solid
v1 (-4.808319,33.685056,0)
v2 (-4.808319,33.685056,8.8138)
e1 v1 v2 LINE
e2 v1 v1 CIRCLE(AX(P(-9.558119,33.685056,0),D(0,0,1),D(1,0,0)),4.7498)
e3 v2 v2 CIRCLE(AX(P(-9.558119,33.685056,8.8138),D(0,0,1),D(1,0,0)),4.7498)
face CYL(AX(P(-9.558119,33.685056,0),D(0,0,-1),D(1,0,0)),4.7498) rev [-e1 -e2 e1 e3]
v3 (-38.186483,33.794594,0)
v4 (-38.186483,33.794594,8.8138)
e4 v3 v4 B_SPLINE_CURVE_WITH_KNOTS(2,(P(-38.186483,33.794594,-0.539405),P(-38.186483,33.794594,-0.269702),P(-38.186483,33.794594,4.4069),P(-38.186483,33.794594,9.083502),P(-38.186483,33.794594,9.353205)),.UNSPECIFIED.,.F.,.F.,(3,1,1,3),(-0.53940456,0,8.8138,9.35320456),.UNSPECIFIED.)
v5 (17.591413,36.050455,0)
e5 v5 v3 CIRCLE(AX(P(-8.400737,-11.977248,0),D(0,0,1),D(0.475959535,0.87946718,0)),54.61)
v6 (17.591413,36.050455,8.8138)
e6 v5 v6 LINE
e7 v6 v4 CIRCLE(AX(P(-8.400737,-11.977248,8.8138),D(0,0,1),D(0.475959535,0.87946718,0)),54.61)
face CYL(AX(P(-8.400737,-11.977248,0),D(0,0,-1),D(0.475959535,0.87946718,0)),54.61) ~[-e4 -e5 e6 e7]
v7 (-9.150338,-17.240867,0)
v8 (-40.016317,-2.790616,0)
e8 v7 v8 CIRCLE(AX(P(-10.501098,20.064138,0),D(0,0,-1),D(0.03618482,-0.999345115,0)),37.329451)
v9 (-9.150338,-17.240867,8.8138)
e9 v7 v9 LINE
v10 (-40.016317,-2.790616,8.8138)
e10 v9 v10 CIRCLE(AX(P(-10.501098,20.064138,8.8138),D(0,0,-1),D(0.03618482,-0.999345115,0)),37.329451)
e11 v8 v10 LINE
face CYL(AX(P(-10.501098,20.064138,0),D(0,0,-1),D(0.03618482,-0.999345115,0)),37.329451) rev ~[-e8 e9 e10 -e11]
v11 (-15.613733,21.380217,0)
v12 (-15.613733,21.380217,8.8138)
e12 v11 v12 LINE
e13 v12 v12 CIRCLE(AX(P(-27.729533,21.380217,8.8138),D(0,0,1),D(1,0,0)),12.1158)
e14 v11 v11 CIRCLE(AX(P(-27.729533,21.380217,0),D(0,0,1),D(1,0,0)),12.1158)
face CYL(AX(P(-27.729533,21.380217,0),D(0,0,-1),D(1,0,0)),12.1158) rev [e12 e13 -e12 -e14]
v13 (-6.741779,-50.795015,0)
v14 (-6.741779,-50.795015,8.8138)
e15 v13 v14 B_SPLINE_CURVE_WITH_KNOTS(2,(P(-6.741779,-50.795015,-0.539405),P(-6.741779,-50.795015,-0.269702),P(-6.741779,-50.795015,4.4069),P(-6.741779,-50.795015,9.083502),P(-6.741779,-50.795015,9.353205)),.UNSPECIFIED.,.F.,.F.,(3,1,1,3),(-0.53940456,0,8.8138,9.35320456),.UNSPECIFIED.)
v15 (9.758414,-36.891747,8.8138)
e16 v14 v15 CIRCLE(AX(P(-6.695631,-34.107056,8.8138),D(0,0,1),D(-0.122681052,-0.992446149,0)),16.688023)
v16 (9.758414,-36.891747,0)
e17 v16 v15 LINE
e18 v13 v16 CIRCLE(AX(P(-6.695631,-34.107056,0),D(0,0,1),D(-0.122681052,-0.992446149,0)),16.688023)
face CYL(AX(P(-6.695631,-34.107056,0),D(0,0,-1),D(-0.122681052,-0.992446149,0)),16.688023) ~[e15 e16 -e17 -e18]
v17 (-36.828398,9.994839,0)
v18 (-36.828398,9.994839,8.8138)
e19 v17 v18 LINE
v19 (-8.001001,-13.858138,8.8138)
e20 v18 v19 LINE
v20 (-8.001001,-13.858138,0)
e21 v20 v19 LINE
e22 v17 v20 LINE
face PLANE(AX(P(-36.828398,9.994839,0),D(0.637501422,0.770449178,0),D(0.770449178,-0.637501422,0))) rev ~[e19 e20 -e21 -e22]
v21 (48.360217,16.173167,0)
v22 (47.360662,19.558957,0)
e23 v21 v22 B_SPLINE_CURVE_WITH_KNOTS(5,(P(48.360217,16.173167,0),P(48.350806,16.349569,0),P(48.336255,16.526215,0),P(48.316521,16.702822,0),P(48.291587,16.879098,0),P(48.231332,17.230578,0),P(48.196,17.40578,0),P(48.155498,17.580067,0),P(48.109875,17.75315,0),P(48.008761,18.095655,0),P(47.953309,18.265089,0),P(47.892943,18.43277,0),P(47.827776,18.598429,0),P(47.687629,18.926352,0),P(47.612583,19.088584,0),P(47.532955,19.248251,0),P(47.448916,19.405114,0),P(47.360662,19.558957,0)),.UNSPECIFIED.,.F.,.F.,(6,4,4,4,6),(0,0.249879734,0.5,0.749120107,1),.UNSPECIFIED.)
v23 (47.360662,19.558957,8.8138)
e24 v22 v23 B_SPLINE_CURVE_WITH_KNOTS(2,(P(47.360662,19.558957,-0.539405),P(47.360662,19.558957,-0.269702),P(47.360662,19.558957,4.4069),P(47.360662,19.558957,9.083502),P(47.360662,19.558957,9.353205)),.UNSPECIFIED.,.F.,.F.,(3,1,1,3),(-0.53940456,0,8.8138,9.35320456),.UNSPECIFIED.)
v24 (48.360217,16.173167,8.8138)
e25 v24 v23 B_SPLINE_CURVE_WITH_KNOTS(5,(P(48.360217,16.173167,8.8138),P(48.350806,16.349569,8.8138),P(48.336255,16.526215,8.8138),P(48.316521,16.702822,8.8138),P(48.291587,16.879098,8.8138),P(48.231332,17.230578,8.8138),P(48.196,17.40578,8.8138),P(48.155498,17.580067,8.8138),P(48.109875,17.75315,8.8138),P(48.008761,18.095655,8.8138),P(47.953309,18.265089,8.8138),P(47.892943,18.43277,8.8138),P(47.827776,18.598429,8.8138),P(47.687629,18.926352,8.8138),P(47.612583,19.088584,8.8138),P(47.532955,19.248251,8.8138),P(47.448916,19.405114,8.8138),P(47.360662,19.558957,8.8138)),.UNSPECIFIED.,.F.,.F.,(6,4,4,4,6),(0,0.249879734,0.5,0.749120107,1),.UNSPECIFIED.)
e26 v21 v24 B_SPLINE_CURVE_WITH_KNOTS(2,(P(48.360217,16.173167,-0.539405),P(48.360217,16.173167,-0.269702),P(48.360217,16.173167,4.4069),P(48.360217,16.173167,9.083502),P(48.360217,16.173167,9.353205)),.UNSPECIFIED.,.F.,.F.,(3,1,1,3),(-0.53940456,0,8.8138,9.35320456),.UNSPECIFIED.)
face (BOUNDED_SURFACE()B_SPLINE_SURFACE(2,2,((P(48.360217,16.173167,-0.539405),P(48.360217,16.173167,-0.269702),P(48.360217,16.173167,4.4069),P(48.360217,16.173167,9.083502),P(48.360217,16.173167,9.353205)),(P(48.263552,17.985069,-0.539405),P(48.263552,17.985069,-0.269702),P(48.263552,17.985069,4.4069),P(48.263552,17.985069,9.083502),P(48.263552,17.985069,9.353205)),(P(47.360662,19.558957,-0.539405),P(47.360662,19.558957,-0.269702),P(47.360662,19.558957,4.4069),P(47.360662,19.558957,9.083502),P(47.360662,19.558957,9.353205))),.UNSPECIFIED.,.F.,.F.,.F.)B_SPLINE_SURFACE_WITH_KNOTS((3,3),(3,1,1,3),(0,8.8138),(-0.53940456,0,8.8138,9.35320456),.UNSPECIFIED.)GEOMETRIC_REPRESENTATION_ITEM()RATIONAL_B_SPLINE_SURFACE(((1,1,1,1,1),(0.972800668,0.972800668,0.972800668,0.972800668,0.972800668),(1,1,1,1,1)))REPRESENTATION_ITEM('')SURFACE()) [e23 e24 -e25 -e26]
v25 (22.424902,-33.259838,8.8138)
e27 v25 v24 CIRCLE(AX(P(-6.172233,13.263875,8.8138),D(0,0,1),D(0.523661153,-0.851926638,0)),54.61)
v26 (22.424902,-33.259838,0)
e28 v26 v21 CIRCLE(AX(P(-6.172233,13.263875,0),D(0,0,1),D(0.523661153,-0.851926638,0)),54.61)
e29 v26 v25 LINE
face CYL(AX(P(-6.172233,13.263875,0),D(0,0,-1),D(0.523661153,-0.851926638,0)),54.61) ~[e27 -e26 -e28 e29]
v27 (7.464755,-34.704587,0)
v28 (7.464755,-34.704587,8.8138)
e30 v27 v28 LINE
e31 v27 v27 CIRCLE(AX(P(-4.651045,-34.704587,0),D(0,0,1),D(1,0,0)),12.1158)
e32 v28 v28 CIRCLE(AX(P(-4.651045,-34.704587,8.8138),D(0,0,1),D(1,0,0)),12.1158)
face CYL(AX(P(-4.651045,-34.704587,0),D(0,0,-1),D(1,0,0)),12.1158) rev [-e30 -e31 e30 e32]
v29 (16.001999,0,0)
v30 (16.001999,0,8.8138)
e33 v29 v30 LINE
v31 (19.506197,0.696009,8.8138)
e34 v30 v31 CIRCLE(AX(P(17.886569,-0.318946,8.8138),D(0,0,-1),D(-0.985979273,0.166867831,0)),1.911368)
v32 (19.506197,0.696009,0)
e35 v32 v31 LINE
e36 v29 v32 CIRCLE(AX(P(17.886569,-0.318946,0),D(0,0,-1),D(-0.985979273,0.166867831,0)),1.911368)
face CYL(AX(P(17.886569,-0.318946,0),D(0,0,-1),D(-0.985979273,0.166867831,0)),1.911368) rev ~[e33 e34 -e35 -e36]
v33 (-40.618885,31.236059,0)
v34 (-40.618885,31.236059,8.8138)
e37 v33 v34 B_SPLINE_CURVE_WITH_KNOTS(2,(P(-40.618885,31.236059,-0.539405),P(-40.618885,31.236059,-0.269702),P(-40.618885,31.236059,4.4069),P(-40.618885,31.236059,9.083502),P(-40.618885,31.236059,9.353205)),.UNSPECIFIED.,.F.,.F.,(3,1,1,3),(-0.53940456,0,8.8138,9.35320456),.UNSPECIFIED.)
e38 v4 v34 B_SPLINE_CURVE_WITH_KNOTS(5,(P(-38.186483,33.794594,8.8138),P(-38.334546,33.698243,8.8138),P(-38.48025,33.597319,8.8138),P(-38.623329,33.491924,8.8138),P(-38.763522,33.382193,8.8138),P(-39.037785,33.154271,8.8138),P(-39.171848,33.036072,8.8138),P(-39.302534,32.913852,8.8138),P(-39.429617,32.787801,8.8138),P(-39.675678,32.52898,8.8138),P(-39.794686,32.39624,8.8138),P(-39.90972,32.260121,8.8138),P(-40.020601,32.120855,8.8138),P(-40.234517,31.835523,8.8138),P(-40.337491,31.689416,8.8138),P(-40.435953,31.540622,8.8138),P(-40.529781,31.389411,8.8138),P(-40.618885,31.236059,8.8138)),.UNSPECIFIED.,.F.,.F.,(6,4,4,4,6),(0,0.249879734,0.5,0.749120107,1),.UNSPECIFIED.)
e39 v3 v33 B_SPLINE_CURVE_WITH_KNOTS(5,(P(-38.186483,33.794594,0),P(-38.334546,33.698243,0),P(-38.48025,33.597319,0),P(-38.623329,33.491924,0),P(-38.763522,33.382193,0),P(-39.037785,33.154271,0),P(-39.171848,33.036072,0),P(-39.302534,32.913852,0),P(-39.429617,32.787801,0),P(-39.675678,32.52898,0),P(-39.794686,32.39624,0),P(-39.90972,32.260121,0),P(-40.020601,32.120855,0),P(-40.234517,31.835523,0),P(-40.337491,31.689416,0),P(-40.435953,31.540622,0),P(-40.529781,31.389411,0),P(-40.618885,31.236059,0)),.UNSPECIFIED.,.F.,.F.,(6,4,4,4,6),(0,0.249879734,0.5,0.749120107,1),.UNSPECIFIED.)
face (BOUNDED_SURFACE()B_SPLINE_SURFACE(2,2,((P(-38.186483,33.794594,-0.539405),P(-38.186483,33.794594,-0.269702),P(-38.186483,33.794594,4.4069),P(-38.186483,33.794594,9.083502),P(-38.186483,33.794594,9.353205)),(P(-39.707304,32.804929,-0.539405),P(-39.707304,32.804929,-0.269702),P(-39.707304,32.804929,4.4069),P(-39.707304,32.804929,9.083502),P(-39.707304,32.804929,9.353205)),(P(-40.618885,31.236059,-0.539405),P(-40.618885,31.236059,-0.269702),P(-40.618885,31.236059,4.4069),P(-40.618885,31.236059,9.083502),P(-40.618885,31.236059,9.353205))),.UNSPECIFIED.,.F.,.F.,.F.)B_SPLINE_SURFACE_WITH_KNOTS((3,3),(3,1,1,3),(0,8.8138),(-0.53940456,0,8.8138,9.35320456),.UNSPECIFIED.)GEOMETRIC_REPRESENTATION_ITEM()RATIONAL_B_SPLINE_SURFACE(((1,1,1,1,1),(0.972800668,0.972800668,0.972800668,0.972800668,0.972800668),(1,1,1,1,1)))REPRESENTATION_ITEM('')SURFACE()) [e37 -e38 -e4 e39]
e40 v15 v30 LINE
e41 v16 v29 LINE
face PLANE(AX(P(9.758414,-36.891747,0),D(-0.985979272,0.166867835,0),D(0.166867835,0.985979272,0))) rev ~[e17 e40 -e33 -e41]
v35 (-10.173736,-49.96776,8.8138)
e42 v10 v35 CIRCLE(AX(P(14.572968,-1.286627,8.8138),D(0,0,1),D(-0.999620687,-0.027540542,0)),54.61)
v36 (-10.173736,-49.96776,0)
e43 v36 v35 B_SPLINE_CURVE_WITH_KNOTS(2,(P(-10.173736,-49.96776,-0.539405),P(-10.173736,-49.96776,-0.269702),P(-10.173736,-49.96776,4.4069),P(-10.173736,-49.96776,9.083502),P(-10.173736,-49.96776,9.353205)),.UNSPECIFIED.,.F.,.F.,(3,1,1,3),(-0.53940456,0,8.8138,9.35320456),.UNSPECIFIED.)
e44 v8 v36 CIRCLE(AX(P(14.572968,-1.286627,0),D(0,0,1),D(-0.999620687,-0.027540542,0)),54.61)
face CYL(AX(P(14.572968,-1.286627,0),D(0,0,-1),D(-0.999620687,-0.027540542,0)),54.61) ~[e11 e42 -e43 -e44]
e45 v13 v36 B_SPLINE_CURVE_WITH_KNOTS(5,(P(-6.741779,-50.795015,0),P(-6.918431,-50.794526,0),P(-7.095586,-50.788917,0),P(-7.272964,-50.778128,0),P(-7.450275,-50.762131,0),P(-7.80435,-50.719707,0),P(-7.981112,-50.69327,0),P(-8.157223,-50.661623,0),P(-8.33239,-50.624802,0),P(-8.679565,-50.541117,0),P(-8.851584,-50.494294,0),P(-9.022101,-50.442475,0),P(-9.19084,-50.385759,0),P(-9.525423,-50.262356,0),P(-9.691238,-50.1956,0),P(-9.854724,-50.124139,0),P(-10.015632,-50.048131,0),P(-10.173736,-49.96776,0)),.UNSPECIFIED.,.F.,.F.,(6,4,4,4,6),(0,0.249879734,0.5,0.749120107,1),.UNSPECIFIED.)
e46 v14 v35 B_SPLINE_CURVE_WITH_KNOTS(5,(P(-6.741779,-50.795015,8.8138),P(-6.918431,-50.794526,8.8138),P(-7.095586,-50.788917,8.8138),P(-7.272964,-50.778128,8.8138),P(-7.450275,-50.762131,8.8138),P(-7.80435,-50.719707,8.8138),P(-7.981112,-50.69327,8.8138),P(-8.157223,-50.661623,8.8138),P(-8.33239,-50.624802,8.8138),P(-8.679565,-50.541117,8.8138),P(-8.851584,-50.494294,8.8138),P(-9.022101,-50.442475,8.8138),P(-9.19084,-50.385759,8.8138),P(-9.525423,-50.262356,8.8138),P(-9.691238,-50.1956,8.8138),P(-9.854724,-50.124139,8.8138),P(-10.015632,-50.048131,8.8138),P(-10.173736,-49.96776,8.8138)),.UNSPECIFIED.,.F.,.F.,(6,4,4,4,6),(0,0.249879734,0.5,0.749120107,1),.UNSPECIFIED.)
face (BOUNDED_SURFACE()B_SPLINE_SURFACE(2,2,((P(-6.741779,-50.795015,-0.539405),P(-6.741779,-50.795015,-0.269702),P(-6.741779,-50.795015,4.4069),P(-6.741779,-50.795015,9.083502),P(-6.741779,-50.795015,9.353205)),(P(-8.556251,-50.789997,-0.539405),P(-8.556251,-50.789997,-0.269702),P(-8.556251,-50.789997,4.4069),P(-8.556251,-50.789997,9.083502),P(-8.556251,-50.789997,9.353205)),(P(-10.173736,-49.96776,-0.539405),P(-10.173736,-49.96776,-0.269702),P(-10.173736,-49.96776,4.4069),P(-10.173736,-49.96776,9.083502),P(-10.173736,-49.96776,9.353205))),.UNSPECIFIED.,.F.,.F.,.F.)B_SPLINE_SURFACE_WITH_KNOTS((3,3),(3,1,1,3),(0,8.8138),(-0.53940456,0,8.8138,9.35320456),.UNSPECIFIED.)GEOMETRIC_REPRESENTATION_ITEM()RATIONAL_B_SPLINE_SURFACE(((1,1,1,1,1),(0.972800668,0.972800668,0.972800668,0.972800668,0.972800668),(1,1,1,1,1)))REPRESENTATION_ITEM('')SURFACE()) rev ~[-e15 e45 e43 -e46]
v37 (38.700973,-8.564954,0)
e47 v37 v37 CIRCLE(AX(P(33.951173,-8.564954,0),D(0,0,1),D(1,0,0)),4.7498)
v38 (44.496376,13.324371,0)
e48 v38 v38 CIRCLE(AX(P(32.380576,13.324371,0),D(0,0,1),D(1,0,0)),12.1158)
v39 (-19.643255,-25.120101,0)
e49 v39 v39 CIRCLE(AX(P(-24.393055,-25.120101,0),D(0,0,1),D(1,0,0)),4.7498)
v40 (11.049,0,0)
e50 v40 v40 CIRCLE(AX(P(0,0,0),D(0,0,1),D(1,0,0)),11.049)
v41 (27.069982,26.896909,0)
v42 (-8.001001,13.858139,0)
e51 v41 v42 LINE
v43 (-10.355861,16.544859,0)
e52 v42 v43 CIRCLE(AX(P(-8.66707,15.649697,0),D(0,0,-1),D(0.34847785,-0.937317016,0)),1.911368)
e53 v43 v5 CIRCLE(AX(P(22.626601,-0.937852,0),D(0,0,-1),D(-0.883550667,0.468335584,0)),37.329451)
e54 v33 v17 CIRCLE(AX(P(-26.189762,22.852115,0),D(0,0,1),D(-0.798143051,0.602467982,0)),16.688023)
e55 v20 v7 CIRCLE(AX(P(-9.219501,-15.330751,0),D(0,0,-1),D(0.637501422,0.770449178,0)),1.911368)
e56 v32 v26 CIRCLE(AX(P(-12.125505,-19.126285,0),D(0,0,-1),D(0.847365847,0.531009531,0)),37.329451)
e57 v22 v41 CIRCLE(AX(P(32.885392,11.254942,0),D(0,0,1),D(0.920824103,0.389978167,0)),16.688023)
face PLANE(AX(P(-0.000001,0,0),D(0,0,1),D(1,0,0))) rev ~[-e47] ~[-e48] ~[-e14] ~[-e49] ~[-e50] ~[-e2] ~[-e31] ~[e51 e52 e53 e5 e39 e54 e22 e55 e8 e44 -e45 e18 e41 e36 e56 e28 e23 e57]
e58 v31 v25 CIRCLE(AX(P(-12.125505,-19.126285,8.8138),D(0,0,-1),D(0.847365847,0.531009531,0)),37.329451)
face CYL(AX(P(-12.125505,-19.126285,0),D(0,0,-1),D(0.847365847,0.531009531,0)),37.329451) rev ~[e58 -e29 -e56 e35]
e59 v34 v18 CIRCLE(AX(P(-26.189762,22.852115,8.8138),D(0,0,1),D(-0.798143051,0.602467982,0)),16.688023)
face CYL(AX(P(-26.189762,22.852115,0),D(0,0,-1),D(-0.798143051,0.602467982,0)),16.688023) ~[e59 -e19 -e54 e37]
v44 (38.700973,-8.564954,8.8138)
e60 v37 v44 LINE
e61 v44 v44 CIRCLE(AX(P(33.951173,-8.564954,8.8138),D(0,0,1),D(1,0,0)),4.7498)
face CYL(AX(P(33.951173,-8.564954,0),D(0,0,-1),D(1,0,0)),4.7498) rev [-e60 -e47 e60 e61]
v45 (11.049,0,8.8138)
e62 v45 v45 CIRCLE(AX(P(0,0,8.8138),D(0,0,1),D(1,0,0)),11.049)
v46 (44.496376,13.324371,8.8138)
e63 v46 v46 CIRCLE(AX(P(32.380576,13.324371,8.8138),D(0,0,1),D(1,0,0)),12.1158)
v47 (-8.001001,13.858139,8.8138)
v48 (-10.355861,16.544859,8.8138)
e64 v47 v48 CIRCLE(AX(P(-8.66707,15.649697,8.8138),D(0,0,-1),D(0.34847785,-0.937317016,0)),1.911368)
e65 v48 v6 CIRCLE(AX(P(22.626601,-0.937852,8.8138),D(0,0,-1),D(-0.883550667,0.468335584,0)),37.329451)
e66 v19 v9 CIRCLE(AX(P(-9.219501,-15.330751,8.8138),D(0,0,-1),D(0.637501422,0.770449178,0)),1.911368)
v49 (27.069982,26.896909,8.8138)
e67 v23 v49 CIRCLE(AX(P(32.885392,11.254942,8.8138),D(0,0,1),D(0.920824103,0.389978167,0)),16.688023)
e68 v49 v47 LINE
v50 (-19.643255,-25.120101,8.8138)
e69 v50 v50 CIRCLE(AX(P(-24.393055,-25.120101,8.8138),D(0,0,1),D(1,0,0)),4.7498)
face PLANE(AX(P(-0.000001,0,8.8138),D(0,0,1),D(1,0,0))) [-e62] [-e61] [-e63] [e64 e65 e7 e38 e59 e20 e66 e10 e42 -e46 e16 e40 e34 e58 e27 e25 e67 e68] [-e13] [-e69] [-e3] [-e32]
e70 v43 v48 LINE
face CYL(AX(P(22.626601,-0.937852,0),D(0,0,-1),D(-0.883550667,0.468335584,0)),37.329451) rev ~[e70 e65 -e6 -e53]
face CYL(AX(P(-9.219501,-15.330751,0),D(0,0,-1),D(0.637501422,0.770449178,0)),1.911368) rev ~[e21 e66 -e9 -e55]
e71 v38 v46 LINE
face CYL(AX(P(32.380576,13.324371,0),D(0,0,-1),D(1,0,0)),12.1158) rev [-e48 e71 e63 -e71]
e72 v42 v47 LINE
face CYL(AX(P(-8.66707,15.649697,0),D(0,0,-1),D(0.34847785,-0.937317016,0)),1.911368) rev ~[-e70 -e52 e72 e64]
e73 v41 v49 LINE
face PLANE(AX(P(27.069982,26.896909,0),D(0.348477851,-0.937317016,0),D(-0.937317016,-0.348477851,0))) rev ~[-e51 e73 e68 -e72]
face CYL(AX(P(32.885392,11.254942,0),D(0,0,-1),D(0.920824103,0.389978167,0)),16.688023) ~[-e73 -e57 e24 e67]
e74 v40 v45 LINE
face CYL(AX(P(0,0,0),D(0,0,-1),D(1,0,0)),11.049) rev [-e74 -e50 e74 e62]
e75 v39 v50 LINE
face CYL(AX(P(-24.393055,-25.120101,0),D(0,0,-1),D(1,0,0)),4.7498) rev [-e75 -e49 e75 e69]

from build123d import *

# Parameters (mm, degrees)
F0_R     = 12.1158
F0_R_2   = 4.7498
F0_R_3   = 11.049
F1_DEPTH = 8.8138
F2_R     = 7.62


# Not quite as in the source:
# - ends of sketch curves that miss each other by under 0.0002 mm in the source are joined


with BuildPart() as f1:
    # F0 (on Top) → F1 (new body)
    with BuildSketch(Plane.XY):
        with BuildLine():
            ThreePointArc((22.4249021167, -33.2598383611), (42.5511926564, -11.3994547245), (48.2521252698, 17.762906479))
            ThreePointArc((48.2521252698, 17.762906479), (39.4932996014, 26.5789641765), (27.0699823404, 26.8969085886))
            Line((27.0699823404, 26.8969085886), (-8.0010006819, 13.8581388051))
            ThreePointArc((-8.0010006819, 13.8581388051), (-10.1044657967, 14.3898463988), (-10.3558611613, 16.5448588871))
            ThreePointArc((-10.3558611613, 16.5448588871), (1.2618519363, 29.6731834096), (17.5914130917, 36.0504551503))
            ThreePointArc((17.5914130917, 36.0504551503), (-11.4033797439, 42.5501422233), (-39.5091916872, 32.90611409))
            ThreePointArc((-39.5091916872, 32.90611409), (-42.7647087802, 20.9127197051), (-36.8283980876, 9.9948391518))
            Line((-36.8283980876, 9.9948391518), (-8.0010006819, -13.8581382646))
            ThreePointArc((-8.0010006819, -13.8581382646), (-7.409740408, -15.9456462868), (-9.1503382861, -17.2408673032))
            ThreePointArc((-9.1503382861, -17.2408673032), (-26.3286573805, -13.743794888), (-40.0163172925, -2.7906159651))
            ThreePointArc((-40.0163172925, -2.7906159651), (-31.1478149966, -31.1506866748), (-8.7429356667, -50.669019745))
            ThreePointArc((-8.7429356667, -50.669019745), (3.2714070948, -47.4916830576), (9.7584136631, -36.8917469163))
            Line((9.7584136631, -36.8917469163), (16.0019992774, 2.702e-07))
            ThreePointArc((16.0019992774, 2.702e-07), (17.514204114, 1.5558007108), (19.5061973633, 0.6960092401))
            ThreePointArc((19.5061973633, 0.6960092401), (25.0668033601, -15.9293876975), (22.4249021167, -33.2598383611))
        make_face()
        with Locations((-4.651045185, -34.7045873419)):
            Circle(F0_R, mode=Mode.SUBTRACT)
        with Locations((-24.3930550349, -25.1201008156)):
            Circle(F0_R_2, mode=Mode.SUBTRACT)
        with Locations((33.9511726837, -8.5649542264)):
            Circle(F0_R_2, mode=Mode.SUBTRACT)
        Circle(F0_R_3, mode=Mode.SUBTRACT)
        with Locations((-27.7295329099, 21.3802167818)):
            Circle(F0_R, mode=Mode.SUBTRACT)
        with Locations((-9.5581186852, 33.6850558475)):
            Circle(F0_R_2, mode=Mode.SUBTRACT)
        with Locations((32.3805760108, 13.3243713841)):
            Circle(F0_R, mode=Mode.SUBTRACT)
    extrude(amount=F1_DEPTH)

    # F2
    f2_edges = [f1.edges().sort_by_distance(p)[0] for p in [
        (-39.509192, 32.906114, 4.4069),
        (48.252125, 17.762906, 4.4069),
        (-8.742936, -50.66902, 4.4069),
    ]]
    fillet(f2_edges, radius=F2_R)


solid = f1.part
